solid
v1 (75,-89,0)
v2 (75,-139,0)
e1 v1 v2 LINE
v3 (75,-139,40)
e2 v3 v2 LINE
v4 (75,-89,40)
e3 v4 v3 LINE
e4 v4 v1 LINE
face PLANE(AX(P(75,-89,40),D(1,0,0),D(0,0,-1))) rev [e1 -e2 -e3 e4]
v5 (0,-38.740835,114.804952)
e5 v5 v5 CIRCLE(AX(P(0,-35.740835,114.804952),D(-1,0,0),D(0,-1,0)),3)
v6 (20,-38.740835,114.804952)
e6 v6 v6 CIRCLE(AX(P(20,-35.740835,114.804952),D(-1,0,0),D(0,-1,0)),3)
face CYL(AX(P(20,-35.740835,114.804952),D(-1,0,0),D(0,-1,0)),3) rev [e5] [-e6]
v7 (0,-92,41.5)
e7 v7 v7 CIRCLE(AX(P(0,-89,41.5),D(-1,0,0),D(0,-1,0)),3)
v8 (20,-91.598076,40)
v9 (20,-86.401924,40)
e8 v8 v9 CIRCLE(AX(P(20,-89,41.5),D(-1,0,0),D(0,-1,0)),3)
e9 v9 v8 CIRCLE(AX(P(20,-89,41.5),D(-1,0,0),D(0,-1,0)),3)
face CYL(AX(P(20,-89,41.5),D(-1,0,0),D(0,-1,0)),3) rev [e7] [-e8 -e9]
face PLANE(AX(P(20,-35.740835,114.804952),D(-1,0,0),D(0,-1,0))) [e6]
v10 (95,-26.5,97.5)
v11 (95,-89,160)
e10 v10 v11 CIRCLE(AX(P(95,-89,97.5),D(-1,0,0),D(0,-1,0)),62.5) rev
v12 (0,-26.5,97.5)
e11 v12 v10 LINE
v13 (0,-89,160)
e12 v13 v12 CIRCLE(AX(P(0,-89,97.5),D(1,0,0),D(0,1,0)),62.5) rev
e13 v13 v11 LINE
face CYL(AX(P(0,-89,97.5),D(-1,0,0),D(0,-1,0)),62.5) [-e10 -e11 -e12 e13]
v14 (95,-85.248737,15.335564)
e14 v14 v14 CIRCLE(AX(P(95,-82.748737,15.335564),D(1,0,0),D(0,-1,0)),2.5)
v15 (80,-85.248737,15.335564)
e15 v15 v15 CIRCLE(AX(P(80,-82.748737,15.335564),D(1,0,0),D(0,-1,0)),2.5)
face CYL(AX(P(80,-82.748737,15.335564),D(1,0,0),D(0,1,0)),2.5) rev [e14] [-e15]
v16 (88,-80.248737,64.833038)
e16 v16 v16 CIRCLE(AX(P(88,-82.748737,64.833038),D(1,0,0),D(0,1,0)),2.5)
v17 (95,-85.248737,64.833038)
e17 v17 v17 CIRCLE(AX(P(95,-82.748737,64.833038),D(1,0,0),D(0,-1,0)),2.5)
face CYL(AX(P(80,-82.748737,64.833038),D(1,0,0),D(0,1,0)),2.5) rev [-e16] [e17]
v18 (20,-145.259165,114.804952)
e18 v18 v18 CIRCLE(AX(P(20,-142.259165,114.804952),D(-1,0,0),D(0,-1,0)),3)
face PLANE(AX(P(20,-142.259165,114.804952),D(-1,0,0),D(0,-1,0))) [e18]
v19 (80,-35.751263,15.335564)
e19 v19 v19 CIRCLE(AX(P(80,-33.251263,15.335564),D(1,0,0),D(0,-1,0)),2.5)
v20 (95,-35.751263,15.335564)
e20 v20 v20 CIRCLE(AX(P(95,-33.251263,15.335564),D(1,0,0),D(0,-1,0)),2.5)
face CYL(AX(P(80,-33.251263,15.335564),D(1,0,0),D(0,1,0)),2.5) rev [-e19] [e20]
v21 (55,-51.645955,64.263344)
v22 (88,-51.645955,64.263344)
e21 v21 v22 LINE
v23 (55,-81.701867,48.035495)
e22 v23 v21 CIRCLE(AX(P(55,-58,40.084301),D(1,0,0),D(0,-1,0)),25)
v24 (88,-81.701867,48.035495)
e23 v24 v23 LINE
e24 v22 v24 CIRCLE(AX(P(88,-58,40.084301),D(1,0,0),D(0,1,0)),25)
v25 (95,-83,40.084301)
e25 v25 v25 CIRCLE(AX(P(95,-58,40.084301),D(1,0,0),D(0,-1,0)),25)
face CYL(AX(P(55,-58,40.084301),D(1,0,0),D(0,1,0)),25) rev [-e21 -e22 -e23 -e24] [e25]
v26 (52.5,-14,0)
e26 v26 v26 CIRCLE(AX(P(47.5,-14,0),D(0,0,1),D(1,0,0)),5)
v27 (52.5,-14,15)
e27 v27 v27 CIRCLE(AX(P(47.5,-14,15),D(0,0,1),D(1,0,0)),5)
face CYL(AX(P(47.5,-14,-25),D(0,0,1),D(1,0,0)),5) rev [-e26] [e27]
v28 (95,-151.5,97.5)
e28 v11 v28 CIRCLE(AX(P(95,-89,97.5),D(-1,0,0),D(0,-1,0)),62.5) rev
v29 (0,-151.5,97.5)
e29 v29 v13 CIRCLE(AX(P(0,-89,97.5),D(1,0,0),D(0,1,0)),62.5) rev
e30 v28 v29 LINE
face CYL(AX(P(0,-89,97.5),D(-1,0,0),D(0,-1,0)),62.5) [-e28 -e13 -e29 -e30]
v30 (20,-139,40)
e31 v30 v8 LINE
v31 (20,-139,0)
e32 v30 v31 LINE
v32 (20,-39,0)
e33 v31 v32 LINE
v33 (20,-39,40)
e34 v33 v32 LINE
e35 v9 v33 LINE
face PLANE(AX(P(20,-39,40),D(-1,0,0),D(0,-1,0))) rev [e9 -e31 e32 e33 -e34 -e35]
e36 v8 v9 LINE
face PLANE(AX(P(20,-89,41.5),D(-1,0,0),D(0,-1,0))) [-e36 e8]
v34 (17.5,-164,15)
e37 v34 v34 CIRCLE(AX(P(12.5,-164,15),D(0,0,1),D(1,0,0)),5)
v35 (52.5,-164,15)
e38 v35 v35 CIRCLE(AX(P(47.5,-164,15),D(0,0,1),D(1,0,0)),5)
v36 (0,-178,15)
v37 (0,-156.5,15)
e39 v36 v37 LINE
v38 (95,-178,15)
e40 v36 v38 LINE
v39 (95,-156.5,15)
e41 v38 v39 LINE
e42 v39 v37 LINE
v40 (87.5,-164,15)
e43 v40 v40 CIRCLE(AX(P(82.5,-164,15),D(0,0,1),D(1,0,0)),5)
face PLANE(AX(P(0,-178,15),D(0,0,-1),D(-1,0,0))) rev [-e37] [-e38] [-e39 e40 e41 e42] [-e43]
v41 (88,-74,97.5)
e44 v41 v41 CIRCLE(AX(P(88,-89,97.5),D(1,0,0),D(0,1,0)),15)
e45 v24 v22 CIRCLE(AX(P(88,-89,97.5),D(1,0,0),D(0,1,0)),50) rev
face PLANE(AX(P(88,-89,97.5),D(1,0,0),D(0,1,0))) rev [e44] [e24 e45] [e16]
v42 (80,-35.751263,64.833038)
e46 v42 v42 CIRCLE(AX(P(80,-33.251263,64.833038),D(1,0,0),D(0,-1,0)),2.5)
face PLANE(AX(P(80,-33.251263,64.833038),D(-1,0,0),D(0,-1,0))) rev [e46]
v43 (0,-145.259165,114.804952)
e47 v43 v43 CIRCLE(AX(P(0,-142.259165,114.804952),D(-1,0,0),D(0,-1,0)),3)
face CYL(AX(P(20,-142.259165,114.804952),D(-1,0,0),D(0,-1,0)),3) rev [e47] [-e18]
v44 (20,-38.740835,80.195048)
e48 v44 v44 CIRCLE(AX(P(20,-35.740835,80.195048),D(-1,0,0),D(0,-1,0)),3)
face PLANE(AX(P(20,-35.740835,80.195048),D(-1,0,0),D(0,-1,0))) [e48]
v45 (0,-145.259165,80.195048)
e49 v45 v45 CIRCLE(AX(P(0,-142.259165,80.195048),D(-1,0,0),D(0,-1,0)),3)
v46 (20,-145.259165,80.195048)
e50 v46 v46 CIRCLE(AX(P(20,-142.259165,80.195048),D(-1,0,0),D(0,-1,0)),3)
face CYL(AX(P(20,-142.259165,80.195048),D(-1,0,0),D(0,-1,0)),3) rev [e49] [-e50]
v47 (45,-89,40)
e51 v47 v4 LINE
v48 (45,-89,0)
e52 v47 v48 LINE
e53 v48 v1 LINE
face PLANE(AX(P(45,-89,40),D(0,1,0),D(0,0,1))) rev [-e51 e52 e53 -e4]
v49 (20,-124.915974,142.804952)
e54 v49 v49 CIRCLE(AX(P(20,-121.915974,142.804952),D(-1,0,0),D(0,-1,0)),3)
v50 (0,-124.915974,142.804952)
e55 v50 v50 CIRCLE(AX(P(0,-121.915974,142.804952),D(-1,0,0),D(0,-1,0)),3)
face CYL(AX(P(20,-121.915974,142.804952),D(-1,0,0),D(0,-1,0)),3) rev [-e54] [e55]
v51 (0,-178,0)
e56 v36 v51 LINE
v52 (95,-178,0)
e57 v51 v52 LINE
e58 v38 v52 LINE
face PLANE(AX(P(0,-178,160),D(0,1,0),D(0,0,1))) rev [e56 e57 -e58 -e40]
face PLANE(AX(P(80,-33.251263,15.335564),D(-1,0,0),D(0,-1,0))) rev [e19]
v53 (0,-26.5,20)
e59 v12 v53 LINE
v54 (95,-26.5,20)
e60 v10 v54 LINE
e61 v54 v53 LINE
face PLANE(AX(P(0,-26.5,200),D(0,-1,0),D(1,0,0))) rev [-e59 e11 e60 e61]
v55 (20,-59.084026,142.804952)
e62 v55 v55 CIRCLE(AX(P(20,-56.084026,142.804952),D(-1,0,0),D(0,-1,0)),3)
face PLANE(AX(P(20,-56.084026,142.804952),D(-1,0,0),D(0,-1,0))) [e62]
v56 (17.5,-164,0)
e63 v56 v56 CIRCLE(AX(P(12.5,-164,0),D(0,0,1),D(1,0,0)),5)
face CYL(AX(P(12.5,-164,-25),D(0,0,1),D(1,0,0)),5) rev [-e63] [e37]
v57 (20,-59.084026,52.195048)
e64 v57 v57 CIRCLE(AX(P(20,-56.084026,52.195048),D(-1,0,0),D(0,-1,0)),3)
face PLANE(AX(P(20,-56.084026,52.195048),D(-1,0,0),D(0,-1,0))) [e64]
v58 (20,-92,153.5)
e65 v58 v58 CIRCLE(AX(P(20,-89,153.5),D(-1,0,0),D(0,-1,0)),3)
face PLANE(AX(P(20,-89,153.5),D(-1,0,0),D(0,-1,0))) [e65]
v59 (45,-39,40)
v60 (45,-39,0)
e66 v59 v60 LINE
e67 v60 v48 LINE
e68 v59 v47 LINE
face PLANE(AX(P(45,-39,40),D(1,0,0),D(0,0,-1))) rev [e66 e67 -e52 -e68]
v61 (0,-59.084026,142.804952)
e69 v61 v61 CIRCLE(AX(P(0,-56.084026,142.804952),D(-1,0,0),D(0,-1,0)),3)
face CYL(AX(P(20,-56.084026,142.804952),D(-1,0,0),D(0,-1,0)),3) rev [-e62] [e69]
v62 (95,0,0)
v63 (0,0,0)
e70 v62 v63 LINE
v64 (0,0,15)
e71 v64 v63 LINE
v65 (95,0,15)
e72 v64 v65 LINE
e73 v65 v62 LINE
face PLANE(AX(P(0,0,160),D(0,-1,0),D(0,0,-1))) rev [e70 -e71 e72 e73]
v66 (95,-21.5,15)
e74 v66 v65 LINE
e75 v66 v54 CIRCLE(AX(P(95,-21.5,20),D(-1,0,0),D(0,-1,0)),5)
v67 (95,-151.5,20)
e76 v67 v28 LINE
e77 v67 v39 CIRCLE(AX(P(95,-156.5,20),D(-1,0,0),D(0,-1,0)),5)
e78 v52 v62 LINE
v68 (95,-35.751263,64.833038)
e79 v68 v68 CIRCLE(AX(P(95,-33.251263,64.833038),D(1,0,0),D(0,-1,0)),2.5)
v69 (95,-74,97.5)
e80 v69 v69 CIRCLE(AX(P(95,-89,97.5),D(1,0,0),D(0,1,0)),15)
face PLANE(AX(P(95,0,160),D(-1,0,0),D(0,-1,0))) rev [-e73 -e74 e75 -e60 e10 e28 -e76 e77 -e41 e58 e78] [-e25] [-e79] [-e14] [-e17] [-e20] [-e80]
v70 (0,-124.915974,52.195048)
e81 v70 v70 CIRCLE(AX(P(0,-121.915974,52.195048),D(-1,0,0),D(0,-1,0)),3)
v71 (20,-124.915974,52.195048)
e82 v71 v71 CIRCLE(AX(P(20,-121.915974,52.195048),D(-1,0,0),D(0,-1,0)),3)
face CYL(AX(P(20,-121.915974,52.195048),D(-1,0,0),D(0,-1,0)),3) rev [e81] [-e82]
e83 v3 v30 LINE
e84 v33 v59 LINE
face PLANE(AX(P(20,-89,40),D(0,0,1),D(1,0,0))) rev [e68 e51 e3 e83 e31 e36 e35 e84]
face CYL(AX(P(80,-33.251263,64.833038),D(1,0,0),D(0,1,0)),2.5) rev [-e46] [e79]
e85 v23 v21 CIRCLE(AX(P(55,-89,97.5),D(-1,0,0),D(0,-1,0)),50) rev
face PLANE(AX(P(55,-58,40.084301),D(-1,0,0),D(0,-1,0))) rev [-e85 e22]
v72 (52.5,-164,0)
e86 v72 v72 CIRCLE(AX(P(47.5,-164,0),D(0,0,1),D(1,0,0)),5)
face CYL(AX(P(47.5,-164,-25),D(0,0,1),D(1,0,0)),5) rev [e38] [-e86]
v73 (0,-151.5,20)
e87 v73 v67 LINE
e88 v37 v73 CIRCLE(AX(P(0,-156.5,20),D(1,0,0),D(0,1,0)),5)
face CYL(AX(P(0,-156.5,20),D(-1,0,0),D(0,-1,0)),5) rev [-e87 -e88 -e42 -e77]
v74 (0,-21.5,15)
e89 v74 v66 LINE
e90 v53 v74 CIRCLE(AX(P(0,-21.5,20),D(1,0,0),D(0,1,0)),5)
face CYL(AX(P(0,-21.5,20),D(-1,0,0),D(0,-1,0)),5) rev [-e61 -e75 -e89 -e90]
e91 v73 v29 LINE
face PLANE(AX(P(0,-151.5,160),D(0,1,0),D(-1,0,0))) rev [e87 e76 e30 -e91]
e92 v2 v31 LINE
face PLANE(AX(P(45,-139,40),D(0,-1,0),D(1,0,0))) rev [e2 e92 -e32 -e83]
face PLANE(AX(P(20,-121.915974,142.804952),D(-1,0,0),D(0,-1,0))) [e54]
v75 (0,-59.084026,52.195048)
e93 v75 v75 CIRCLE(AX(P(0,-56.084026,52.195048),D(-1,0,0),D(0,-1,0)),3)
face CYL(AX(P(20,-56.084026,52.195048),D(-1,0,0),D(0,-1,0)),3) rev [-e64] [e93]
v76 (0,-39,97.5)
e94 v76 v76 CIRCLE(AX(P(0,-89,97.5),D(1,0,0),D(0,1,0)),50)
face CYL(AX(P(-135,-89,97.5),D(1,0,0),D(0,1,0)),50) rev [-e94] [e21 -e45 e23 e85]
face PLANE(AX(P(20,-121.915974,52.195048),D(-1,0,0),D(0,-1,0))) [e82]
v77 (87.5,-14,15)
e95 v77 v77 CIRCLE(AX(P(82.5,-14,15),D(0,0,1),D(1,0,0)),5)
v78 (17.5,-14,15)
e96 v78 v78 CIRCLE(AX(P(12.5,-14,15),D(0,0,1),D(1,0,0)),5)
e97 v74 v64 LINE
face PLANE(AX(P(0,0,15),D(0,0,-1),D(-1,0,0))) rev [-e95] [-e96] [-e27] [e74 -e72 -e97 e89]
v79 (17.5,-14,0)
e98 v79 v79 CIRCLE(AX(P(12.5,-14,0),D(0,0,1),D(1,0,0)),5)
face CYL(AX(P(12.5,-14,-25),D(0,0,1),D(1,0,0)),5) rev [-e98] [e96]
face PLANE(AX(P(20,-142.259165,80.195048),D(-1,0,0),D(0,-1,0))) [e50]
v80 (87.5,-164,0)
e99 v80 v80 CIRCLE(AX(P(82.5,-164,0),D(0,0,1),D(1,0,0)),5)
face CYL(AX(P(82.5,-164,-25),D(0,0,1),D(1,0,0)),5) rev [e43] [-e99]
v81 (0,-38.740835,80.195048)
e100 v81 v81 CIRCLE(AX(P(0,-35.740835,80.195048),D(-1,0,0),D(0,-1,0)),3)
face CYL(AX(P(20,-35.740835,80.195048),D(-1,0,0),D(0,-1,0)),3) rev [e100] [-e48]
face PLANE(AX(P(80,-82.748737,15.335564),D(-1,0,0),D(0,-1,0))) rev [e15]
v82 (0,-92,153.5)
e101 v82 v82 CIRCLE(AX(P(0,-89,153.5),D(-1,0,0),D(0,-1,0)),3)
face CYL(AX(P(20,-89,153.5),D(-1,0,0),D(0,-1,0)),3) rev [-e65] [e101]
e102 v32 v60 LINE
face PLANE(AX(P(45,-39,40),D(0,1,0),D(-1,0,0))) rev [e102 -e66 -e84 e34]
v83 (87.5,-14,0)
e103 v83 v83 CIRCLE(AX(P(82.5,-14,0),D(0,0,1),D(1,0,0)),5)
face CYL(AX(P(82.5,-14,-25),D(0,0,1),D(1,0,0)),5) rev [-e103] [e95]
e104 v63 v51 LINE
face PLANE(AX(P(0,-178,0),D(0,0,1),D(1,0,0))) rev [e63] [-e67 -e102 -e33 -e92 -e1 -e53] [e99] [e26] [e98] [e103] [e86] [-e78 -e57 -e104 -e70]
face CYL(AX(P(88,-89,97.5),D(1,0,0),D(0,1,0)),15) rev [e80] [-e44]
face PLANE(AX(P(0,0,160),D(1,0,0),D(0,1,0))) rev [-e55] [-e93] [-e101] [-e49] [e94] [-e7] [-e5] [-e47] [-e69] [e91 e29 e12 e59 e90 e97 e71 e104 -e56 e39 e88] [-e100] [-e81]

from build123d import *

# Parameters (mm, degrees)
SKETCH_1_W          = 95
SKETCH_1_H          = 178
EXTRUDE_1_DEPTH     = 160
SKETCH_2_W          = 145
SKETCH_2_H          = 26.5
SKETCH_2_W_2        = 185
CUT_EXTRUDE_1_DEPTH = 258.50533975
FILLET_1_R          = 62.5
SKETCH_3_R          = 50
CUT_EXTRUDE_2_DEPTH = 230
SKETCH_5_R          = 50
SKETCH_5_R_2        = 15
EXTRUDE_3_DEPTH     = 7
SKETCH_6_R          = 25
CUT_EXTRUDE_3_DEPTH = 40
SKETCH_11_R         = 2.5
CUT_EXTRUDE_4_DEPTH = 15
CUT_EXTRUDE_5_DEPTH = 40
SKETCH_13_R         = 3
CUT_EXTRUDE_6_DEPTH = 20
SKETCH_14_R         = 5
CUT_EXTRUDE_7_DEPTH = 40
FILLET_2_R          = 5


with BuildPart() as part:
    # 草图1 → 拉伸1 (new body)
    with BuildSketch(Plane.XY):
        with Locations((47.5, -89)):
            Rectangle(SKETCH_1_W, SKETCH_1_H)
    extrude(amount=EXTRUDE_1_DEPTH)

    # 草图2 → 切除-拉伸1 (cut, through all)
    with BuildSketch(Plane(origin=(95, 0, 0), x_dir=(0, 0, -1), z_dir=(1, 0, 0))):
        with Locations((-87.5, -164.75)):
            Rectangle(SKETCH_2_W, SKETCH_2_H)
        with Locations((-107.5, -13.25)):
            Rectangle(SKETCH_2_W_2, SKETCH_2_H)
    extrude(amount=-CUT_EXTRUDE_1_DEPTH, mode=Mode.SUBTRACT)

    # 圆角1
    fillet_1_edges = [part.edges().sort_by_distance(p)[0] for p in [
        (47.5, -26.5, 160),
        (47.5, -151.5, 160),
    ]]
    fillet(fillet_1_edges, radius=FILLET_1_R - 0.0001)  # a hair under: the kernel refuses the full size

    # 草图3 → 切除-拉伸2 (cut)
    with BuildSketch(Plane(origin=(95, 0, 0), x_dir=(0, 0, -1), z_dir=(1, 0, 0))):
        with Locations(Location((-97.5, -89, 0), (0, 0, 90))):
            Circle(SKETCH_3_R)
    extrude(amount=-CUT_EXTRUDE_2_DEPTH, mode=Mode.SUBTRACT)

    # 草图5 → 拉伸3 (add)
    with BuildSketch(Plane(origin=(95, 0, 0), x_dir=(0, 0, -1), z_dir=(1, 0, 0))):
        with Locations(Location((-97.5, -89, 0), (0, 0, 90))):
            Circle(SKETCH_5_R)
        with Locations(Location((-97.5, -89, 0), (0, 0, 90))):
            Circle(SKETCH_5_R_2, mode=Mode.SUBTRACT)
    extrude(amount=-EXTRUDE_3_DEPTH)

    # 草图6 → 切除-拉伸3 (cut)
    with BuildSketch(Plane(origin=(95, 0, 0), x_dir=(0, 0, -1), z_dir=(1, 0, 0))):
        with Locations(Location((-40.084300927, -58, 0), (0, 0, 165.276076349))):
            Circle(SKETCH_6_R)
    extrude(amount=-CUT_EXTRUDE_3_DEPTH, mode=Mode.SUBTRACT)

    # 草图11 → 切除-拉伸4 (cut)
    with BuildSketch(Plane(origin=(95, 0, 0), x_dir=(0, 0, -1), z_dir=(1, 0, 0))):
        with Locations(Location((-64.833038269, -82.748737342, 0), (0, 0, 90))):
            Circle(SKETCH_11_R)
        with Locations(Location((-64.833038269, -33.251262658, 0), (0, 0, 270))):
            Circle(SKETCH_11_R)
        with Locations(Location((-15.335563586, -33.251262658, 0), (0, 0, 270))):
            Circle(SKETCH_11_R)
        with Locations(Location((-15.335563586, -82.748737342, 0), (0, 0, 270))):
            Circle(SKETCH_11_R)
    extrude(amount=-CUT_EXTRUDE_4_DEPTH, mode=Mode.SUBTRACT)

    # 草图12 → 切除-拉伸5 (cut)
    with BuildSketch(Plane(origin=(0, 0, 0), x_dir=(-1, 0, 0), z_dir=(0, 0, -1))):
        Polygon((-45, -39), (-20, -39), (-20, -139), (-45, -139), (-75, -139), (-75, -89), (-45, -89), align=None)
    extrude(amount=-CUT_EXTRUDE_5_DEPTH, mode=Mode.SUBTRACT)

    # 草图13 → 切除-拉伸6 (cut)
    with BuildSketch(Plane.ZY):
        with Locations(Location((153.5, -89, 0), (0, 0, 270))):
            Circle(SKETCH_13_R)
        with Locations(Location((142.804951685, -121.915974128, 0), (0, 0, 270))):
            Circle(SKETCH_13_R)
        with Locations(Location((114.804951685, -142.259164913, 0), (0, 0, 270))):
            Circle(SKETCH_13_R)
        with Locations(Location((80.195048315, -142.259164913, 0), (0, 0, 270))):
            Circle(SKETCH_13_R)
        with Locations(Location((52.195048315, -121.915974128, 0), (0, 0, 270))):
            Circle(SKETCH_13_R)
        with Locations(Location((41.5, -89, 0), (0, 0, 270))):
            Circle(SKETCH_13_R)
        with Locations(Location((52.195048315, -56.084025872, 0), (0, 0, 270))):
            Circle(SKETCH_13_R)
        with Locations(Location((80.195048315, -35.740835087, 0), (0, 0, 270))):
            Circle(SKETCH_13_R)
        with Locations(Location((114.804951685, -35.740835087, 0), (0, 0, 270))):
            Circle(SKETCH_13_R)
        with Locations(Location((142.804951685, -56.084025872, 0), (0, 0, 270))):
            Circle(SKETCH_13_R)
    extrude(amount=-CUT_EXTRUDE_6_DEPTH, mode=Mode.SUBTRACT)

    # 草图14 → 切除-拉伸7 (cut)
    with BuildSketch(Plane.XY.offset(15)):
        with Locations((12.5, -164)):
            Circle(SKETCH_14_R)
        with Locations((47.5, -164)):
            Circle(SKETCH_14_R)
        with Locations((82.5, -164)):
            Circle(SKETCH_14_R)
        with Locations((12.5, -14)):
            Circle(SKETCH_14_R)
        with Locations((47.5, -14)):
            Circle(SKETCH_14_R)
        with Locations((82.5, -14)):
            Circle(SKETCH_14_R)
    extrude(amount=-CUT_EXTRUDE_7_DEPTH, mode=Mode.SUBTRACT)

    # 圆角2
    fillet_2_edges = [part.edges().sort_by_distance(p)[0] for p in [
        (47.5, -151.5, 15),
        (47.5, -26.5, 15),
    ]]
    fillet(fillet_2_edges, radius=FILLET_2_R)


solid = part.part
